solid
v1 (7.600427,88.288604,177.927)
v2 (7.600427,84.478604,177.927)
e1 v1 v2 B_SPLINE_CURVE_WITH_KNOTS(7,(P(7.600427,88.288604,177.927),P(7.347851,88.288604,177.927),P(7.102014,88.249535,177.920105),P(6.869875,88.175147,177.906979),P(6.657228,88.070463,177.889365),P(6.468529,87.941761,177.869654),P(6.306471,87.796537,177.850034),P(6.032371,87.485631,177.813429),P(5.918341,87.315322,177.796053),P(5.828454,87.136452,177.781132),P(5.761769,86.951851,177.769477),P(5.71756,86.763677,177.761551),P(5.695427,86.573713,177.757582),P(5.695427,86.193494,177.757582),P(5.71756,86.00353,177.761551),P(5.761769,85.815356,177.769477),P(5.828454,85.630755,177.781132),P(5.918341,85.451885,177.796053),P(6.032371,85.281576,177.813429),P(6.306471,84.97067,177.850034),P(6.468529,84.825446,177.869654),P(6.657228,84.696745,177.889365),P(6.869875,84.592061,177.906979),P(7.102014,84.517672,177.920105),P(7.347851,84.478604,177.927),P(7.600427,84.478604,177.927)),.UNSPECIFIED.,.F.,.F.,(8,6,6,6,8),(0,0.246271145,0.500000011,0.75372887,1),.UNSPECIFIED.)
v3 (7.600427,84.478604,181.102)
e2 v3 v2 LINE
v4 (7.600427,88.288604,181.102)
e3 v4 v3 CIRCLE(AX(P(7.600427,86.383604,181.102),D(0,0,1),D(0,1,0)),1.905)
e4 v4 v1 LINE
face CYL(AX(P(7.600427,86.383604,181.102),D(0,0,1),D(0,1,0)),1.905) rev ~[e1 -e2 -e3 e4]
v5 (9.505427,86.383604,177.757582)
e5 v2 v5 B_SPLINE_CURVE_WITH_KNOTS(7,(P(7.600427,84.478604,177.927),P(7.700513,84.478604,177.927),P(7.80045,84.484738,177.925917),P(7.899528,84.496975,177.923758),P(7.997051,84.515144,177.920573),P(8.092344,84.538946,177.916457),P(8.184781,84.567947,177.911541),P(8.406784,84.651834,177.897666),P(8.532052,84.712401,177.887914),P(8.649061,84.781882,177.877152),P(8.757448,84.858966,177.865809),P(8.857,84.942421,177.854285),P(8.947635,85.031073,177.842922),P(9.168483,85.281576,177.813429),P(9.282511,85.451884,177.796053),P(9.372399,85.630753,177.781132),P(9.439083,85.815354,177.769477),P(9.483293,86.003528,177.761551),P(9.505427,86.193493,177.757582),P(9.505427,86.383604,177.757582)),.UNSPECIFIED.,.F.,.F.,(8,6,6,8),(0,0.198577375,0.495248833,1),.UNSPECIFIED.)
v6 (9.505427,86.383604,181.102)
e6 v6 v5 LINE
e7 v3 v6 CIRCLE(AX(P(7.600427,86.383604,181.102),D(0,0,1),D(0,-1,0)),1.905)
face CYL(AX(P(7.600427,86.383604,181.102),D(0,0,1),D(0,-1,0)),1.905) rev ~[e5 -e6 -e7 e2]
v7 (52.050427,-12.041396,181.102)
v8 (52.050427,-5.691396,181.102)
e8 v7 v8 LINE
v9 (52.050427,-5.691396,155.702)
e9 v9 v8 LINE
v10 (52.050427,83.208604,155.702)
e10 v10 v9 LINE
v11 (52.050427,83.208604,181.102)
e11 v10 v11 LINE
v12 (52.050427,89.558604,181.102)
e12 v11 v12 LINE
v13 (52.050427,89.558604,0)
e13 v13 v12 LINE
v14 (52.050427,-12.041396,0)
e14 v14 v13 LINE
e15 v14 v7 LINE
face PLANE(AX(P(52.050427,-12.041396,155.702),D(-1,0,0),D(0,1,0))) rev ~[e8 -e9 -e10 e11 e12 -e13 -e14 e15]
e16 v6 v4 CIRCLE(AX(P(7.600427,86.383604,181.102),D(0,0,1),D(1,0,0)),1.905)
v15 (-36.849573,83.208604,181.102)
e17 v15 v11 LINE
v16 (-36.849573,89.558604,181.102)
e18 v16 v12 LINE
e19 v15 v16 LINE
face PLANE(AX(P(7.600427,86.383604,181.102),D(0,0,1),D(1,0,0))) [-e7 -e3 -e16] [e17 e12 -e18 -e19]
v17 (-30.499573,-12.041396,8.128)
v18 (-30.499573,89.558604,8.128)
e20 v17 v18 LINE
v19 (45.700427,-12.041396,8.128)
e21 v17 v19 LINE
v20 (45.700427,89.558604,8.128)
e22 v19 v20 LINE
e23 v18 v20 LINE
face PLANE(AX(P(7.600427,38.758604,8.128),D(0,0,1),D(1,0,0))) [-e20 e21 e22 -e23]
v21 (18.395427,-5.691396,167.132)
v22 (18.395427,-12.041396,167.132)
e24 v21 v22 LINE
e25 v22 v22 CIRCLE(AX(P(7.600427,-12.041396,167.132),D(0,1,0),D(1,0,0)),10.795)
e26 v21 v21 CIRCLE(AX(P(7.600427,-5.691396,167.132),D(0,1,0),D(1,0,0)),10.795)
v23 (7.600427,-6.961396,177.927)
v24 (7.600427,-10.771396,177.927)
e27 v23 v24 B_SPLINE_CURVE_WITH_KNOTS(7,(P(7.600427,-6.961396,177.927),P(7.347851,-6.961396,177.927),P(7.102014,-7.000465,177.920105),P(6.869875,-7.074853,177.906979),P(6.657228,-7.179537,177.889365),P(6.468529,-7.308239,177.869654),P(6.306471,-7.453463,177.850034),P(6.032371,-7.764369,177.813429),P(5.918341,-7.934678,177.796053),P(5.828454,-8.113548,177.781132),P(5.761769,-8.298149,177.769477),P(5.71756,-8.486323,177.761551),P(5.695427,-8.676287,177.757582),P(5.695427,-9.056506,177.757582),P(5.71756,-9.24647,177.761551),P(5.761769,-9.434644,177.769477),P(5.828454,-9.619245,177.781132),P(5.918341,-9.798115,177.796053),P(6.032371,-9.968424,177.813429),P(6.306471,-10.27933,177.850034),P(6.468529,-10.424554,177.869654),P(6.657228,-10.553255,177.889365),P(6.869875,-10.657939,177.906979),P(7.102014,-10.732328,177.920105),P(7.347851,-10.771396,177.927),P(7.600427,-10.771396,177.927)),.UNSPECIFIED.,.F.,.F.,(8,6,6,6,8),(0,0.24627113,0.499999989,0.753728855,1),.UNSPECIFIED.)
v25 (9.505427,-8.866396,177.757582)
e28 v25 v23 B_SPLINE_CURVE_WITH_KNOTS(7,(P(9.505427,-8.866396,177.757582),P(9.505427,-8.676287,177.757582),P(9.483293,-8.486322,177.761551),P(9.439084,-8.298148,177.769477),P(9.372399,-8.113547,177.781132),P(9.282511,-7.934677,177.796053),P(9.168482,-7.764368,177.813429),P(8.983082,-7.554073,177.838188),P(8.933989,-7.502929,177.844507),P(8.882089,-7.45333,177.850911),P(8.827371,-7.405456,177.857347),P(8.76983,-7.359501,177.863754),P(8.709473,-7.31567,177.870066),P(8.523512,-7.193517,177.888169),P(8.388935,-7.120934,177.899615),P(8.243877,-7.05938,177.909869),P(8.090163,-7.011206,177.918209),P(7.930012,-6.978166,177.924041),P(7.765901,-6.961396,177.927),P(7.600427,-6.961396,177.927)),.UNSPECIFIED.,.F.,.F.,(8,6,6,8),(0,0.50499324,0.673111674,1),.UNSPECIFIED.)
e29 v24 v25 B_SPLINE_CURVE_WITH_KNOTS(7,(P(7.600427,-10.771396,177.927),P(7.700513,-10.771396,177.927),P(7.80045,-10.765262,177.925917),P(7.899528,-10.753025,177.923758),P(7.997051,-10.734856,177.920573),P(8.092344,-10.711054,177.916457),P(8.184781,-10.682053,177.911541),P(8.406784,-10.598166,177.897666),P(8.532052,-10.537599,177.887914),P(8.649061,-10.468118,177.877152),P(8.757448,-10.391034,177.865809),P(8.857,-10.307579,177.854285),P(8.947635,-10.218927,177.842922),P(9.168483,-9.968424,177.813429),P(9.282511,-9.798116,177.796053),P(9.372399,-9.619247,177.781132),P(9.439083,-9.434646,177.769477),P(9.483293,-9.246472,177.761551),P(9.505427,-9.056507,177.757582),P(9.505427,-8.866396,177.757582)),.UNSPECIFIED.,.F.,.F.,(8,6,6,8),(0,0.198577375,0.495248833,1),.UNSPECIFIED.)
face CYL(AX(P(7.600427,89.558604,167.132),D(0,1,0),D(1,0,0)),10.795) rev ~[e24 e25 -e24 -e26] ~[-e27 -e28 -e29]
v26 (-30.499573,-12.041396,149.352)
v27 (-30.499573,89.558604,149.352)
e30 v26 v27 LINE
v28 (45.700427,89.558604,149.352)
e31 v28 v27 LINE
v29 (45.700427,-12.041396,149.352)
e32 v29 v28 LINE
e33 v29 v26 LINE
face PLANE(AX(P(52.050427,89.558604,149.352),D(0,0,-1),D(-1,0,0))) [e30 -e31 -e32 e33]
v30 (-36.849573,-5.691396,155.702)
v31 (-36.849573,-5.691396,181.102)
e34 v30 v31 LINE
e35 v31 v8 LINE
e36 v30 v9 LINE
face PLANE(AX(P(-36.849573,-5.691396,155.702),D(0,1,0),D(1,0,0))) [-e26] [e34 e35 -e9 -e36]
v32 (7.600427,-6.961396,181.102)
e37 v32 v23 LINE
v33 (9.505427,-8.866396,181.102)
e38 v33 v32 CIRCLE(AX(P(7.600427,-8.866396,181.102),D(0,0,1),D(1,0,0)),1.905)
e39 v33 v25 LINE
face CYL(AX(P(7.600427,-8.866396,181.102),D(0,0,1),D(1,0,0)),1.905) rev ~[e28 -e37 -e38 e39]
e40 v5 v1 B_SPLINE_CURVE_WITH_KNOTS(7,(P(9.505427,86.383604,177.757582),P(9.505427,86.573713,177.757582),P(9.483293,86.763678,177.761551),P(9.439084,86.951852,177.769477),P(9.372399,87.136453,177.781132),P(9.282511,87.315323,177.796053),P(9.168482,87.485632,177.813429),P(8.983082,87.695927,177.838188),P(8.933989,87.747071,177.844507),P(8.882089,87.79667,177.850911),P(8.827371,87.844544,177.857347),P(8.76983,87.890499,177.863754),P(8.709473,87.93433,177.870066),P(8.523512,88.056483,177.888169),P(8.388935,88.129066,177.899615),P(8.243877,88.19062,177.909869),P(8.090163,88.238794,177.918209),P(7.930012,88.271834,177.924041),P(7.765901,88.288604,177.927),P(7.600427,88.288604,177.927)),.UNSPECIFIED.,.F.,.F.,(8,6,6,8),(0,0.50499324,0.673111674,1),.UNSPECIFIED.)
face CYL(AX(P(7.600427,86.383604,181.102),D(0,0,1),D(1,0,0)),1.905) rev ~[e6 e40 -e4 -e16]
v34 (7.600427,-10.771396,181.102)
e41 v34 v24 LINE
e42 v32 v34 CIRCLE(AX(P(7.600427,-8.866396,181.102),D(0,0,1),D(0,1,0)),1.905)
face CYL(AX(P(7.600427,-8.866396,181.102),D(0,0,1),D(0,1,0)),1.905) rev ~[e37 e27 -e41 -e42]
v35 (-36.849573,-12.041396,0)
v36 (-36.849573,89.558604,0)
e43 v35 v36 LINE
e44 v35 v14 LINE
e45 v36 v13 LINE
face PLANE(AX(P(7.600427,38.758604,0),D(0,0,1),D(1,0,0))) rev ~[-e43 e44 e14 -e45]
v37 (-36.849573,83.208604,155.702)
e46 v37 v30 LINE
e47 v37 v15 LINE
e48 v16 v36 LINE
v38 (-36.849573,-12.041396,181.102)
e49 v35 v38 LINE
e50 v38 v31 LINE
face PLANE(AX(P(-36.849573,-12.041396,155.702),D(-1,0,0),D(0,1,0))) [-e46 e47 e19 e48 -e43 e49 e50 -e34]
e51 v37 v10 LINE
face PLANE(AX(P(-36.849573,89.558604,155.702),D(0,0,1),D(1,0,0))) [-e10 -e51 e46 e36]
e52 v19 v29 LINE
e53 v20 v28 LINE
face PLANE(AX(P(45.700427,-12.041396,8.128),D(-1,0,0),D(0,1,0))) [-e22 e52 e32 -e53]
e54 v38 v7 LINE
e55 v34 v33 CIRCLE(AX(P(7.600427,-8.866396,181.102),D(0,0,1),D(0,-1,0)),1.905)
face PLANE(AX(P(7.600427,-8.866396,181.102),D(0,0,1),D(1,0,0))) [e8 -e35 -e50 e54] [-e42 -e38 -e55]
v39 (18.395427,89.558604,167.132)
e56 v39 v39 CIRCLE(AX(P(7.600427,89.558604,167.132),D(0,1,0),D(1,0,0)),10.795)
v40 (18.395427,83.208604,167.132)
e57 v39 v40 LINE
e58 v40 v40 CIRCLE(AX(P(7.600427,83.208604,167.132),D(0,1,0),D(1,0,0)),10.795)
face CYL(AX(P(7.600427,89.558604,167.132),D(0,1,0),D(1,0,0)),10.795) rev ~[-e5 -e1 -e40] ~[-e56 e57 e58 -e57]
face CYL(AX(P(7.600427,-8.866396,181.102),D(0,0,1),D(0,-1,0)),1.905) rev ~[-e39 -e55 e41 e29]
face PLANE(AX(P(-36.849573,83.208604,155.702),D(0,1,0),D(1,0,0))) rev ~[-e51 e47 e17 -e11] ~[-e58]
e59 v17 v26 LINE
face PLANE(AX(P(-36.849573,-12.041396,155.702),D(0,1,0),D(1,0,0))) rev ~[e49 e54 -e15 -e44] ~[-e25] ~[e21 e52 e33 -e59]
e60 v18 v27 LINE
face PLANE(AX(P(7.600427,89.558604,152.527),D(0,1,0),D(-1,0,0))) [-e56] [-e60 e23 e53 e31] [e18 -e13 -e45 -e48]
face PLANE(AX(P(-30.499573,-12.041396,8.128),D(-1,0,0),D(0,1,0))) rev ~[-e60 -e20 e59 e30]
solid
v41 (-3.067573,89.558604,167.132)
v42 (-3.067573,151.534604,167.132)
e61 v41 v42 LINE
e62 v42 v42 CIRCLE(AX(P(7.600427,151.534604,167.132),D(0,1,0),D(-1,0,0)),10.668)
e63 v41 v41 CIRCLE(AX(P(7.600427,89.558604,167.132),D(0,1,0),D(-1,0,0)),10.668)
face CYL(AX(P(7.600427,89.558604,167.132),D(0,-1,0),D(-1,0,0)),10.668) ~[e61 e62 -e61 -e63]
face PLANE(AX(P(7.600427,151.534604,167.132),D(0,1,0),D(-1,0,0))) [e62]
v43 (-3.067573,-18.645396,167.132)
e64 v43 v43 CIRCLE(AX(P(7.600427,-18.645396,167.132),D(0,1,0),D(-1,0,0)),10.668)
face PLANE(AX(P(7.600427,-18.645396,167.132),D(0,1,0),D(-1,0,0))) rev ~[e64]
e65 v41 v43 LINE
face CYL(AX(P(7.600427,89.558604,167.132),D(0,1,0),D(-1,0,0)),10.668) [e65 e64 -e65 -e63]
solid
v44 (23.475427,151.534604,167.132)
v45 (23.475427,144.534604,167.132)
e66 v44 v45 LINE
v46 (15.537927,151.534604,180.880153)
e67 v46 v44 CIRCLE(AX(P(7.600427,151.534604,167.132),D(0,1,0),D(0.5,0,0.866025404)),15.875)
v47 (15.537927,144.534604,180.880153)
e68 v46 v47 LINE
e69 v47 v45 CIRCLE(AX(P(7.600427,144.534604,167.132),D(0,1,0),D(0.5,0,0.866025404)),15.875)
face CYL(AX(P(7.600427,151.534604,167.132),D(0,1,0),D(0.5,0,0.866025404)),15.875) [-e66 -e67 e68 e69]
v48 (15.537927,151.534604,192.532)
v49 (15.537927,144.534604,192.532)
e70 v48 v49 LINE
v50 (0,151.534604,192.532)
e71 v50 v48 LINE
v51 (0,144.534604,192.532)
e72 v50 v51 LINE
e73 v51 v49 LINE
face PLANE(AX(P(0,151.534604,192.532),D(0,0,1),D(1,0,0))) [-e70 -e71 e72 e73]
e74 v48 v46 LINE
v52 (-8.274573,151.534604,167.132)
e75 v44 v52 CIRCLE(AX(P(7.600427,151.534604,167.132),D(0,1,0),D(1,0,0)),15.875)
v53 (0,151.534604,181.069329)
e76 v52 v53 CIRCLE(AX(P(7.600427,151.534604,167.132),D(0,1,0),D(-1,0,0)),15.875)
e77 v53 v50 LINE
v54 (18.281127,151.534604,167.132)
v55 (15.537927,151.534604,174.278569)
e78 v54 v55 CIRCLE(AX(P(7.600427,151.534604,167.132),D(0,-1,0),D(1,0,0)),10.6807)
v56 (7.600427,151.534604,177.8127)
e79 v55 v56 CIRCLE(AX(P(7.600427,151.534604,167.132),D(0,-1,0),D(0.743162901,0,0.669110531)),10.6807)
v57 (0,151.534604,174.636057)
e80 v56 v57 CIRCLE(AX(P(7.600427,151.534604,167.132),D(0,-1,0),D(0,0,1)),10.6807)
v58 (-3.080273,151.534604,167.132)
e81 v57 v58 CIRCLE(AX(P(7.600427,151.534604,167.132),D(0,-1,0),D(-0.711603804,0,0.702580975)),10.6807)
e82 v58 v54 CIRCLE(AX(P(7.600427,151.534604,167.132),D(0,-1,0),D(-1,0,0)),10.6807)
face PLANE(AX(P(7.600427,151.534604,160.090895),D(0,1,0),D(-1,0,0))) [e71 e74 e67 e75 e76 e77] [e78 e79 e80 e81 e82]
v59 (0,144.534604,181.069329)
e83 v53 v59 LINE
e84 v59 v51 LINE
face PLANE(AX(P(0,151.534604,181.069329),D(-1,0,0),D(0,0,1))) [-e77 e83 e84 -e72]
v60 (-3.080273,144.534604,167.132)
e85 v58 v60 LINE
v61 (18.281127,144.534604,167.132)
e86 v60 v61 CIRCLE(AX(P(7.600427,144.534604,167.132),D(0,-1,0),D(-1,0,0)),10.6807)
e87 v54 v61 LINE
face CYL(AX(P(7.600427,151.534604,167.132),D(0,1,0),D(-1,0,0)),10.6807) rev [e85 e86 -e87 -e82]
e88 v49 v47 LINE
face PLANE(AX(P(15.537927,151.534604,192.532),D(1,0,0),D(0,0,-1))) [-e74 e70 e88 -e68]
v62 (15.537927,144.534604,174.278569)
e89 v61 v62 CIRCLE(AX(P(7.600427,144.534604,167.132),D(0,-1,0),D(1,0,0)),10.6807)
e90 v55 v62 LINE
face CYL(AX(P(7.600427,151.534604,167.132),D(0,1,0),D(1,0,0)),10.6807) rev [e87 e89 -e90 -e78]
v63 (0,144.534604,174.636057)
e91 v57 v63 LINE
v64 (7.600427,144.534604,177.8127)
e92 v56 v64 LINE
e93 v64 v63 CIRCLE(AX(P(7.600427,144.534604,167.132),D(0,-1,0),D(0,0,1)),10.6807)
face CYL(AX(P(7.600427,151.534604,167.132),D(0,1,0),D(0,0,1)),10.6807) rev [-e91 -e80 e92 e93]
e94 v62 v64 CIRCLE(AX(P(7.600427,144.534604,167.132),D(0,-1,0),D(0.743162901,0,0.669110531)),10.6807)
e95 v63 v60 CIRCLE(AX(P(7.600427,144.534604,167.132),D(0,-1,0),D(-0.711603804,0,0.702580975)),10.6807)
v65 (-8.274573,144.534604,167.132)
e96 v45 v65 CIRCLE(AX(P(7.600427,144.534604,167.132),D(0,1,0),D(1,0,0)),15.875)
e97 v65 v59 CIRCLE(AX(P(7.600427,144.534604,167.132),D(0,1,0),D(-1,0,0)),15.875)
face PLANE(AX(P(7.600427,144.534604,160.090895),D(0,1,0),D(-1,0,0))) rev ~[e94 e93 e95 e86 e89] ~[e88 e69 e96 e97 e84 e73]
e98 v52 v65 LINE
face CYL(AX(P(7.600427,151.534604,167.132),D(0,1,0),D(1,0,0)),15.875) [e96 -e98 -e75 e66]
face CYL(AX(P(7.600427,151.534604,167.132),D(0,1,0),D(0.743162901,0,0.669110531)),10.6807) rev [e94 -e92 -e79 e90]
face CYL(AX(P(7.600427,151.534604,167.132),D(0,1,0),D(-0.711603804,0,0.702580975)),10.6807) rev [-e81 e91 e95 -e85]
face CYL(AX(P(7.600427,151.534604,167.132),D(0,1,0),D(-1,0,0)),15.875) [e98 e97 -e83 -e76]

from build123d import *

# Parameters (mm, degrees)
F0_W      = 88.9
F0_H      = 101.6
F1_DEPTH  = 8.128
F2_W      = 6.35
F2_H      = 101.6
F3_DEPTH  = 141.224
F5_DEPTH  = 101.6
F6_W      = 88.9
F6_H      = 6.35
F7_DEPTH  = 25.4
F9_DEPTH  = 153.162
F10_R     = 10.668
F11_DEPTH = 108.204
F12_DEPTH = 61.976
F14_DEPTH = 7
F16_DEPTH = 7.62
F18_DEPTH = 7.62


with BuildPart() as f1:
    # F0 (on Top) → F1 (new body)
    with BuildSketch(Plane.XY):
        with Locations((7.6004267454, 38.7586035386)):
            Rectangle(F0_W, F0_H)
    extrude(amount=F1_DEPTH)

    # F2 (on face) → F3 (join)
    with BuildSketch(Plane.XY.offset(8.128)):
        with Locations((48.8754267454, 38.7586035386)):
            Rectangle(F2_W, F2_H)
        with Locations((-33.6745732546, 38.7586035386)):
            Rectangle(F2_W, F2_H)
    extrude(amount=F3_DEPTH)

    # F4 (on face) → F5 (join)
    with BuildSketch(Plane(origin=(0, 89.5586035386, 0), x_dir=(-1, 0, 0), z_dir=(0, 1, 0))):
        Polygon((-52.0504267454, 155.702), (-52.0504267454, 149.352), (-45.7004267454, 149.352), (30.4995732546, 149.352), (36.8495732546, 149.352), (36.8495732546, 155.702), align=None)
    extrude(amount=-F5_DEPTH)

    # F6 (on face) → F7 (join)
    with BuildSketch(Plane.XY.offset(155.702)):
        with Locations((7.6004267454, -8.8663964614)):
            Rectangle(F6_W, F6_H)
        with Locations((7.6004267454, 86.3836035386)):
            Rectangle(F6_W, F6_H)
    extrude(amount=F7_DEPTH)

    # F8 (on face) → F9 (cut)
    with BuildSketch(Plane(origin=(0, 89.5586035386, 0), x_dir=(-1, 0, 0), z_dir=(0, 1, 0))):
        with BuildLine():
            Line((-7.6004267454, 167.132), (3.1945732546, 167.132))
            ThreePointArc((3.1945732546, 167.132), (-7.6004267454, 177.927), (-18.3954267454, 167.132))
            Line((-18.3954267454, 167.132), (-7.6004267454, 167.132))
        make_face()
        with BuildLine():
            ThreePointArc((-18.3954267454, 167.132), (-7.6004267454, 156.337), (3.1945732546, 167.132))
            Line((3.1945732546, 167.132), (-7.6004267454, 167.132))
            Line((-7.6004267454, 167.132), (-18.3954267454, 167.132))
        make_face()
    extrude(amount=-F9_DEPTH, mode=Mode.SUBTRACT)

    # F15 (on face) → F16 (cut)
    with BuildSketch(Plane.XY.offset(181.102)):
        with BuildLine():
            ThreePointArc((9.5054267454, -8.8663964614), (8.9474651636, -7.5193580433), (7.6004267454, -6.9613964614))
            Line((7.6004267454, -6.9613964614), (7.6004267454, -10.7713964614))
            ThreePointArc((7.6004267454, -10.7713964614), (8.9474651636, -10.2134348796), (9.5054267454, -8.8663964614))
        make_face()
        with BuildLine():
            Line((7.6004267454, -10.7713964614), (7.6004267454, -6.9613964614))
            ThreePointArc((7.6004267454, -6.9613964614), (5.6954267454, -8.8663964614), (7.6004267454, -10.7713964614))
        make_face()
    extrude(amount=-F16_DEPTH, mode=Mode.SUBTRACT)

    # F17 (on face) → F18 (cut)
    with BuildSketch(Plane.XY.offset(181.102)):
        with BuildLine():
            ThreePointArc((9.5054267454, 86.3836035386), (8.9474651636, 87.7306419567), (7.6004267454, 88.2886035386))
            Line((7.6004267454, 88.2886035386), (7.6004267454, 84.4786035386))
            ThreePointArc((7.6004267454, 84.4786035386), (8.9474651636, 85.0365651204), (9.5054267454, 86.3836035386))
        make_face()
        with BuildLine():
            Line((7.6004267454, 84.4786035386), (7.6004267454, 88.2886035386))
            ThreePointArc((7.6004267454, 88.2886035386), (5.6954267454, 86.3836035386), (7.6004267454, 84.4786035386))
        make_face()
    extrude(amount=-F18_DEPTH, mode=Mode.SUBTRACT)


with BuildPart() as f11:
    # F10 (on face) → F11 (new body)
    with BuildSketch(Plane(origin=(0, 89.5586035386, 0), x_dir=(-1, 0, 0), z_dir=(0, 1, 0))):
        with Locations((-7.6004267454, 167.132)):
            Circle(F10_R)
    extrude(amount=-F11_DEPTH)

    # F12 (add): a face of the model
    f12_faces = [f11.faces().sort_by_distance(p)[0] for p in [
        (7.6004267454, 89.5586035386, 167.132),
    ]]
    extrude(f12_faces, amount=F12_DEPTH)


with BuildPart() as f14:
    # F13 (on face) → F14 (new body)
    with BuildSketch(Plane(origin=(0, 151.5346035386, 0), x_dir=(-1, 0, 0), z_dir=(0, 1, 0))):
        with BuildLine():
            Line((-18.2811267454, 167.132), (-23.4754267454, 167.132))
            ThreePointArc((-23.4754267454, 167.132), (-7.6004267454, 151.257), (8.2745732546, 167.132))
            Line((8.2745732546, 167.132), (3.0802732546, 167.132))
            ThreePointArc((3.0802732546, 167.132), (-7.6004267454, 156.4513), (-18.2811267454, 167.132))
        make_face()
        with BuildLine():
            ThreePointArc((-15.5379267454, 180.8801532851), (-21.3485800305, 175.0695), (-23.4754267454, 167.132))
            Line((-23.4754267454, 167.132), (-18.2811267454, 167.132))
            ThreePointArc((-18.2811267454, 167.132), (-17.5717709061, 170.9594858746), (-15.5379267454, 174.2785688439))
            Line((-15.5379267454, 174.2785688439), (-15.5379267454, 180.8801532851))
        make_face()
        with BuildLine():
            Line((0, 174.6360566214), (0, 181.069328951))
            ThreePointArc((0, 181.069328951), (-3.6786587829, 182.514956837), (-7.6004267454, 183.007))
            Line((-7.6004267454, 183.007), (-7.6004267454, 177.8127))
            ThreePointArc((-7.6004267454, 177.8127), (-3.4816420379, 176.9865910632), (0, 174.6360566214))
        make_face()
        with BuildLine():
            Line((3.0802732546, 167.132), (8.2745732546, 167.132))
            ThreePointArc((8.2745732546, 167.132), (6.0500750692, 175.2362843736), (0, 181.069328951))
            Line((0, 181.069328951), (0, 174.6360566214))
            ThreePointArc((0, 174.6360566214), (2.2802420181, 171.1878275697), (3.0802732546, 167.132))
        make_face()
        with BuildLine():
            ThreePointArc((-7.6004267454, 183.007), (-11.7091790864, 182.4660724923), (-15.5379267454, 180.8801532851))
            Line((-15.5379267454, 180.8801532851), (-15.5379267454, 174.2785688439))
            ThreePointArc((-15.5379267454, 174.2785688439), (-11.9447906021, 176.8892462903), (-7.6004267454, 177.8127))
            Line((-7.6004267454, 177.8127), (-7.6004267454, 183.007))
        make_face()
        with BuildLine():
            Line((-15.5379267454, 192.532), (-15.5379267454, 180.8801532851))
            ThreePointArc((-15.5379267454, 180.8801532851), (-11.7091790864, 182.4660724923), (-7.6004267454, 183.007))
            ThreePointArc((-7.6004267454, 183.007), (-3.6786587829, 182.514956837), (0, 181.069328951))
            Line((0, 181.069328951), (0, 192.532))
            Line((0, 192.532), (-15.5379267454, 192.532))
        make_face()
    extrude(amount=-F14_DEPTH)


solid = Compound([f1.part, f11.part, f14.part])
